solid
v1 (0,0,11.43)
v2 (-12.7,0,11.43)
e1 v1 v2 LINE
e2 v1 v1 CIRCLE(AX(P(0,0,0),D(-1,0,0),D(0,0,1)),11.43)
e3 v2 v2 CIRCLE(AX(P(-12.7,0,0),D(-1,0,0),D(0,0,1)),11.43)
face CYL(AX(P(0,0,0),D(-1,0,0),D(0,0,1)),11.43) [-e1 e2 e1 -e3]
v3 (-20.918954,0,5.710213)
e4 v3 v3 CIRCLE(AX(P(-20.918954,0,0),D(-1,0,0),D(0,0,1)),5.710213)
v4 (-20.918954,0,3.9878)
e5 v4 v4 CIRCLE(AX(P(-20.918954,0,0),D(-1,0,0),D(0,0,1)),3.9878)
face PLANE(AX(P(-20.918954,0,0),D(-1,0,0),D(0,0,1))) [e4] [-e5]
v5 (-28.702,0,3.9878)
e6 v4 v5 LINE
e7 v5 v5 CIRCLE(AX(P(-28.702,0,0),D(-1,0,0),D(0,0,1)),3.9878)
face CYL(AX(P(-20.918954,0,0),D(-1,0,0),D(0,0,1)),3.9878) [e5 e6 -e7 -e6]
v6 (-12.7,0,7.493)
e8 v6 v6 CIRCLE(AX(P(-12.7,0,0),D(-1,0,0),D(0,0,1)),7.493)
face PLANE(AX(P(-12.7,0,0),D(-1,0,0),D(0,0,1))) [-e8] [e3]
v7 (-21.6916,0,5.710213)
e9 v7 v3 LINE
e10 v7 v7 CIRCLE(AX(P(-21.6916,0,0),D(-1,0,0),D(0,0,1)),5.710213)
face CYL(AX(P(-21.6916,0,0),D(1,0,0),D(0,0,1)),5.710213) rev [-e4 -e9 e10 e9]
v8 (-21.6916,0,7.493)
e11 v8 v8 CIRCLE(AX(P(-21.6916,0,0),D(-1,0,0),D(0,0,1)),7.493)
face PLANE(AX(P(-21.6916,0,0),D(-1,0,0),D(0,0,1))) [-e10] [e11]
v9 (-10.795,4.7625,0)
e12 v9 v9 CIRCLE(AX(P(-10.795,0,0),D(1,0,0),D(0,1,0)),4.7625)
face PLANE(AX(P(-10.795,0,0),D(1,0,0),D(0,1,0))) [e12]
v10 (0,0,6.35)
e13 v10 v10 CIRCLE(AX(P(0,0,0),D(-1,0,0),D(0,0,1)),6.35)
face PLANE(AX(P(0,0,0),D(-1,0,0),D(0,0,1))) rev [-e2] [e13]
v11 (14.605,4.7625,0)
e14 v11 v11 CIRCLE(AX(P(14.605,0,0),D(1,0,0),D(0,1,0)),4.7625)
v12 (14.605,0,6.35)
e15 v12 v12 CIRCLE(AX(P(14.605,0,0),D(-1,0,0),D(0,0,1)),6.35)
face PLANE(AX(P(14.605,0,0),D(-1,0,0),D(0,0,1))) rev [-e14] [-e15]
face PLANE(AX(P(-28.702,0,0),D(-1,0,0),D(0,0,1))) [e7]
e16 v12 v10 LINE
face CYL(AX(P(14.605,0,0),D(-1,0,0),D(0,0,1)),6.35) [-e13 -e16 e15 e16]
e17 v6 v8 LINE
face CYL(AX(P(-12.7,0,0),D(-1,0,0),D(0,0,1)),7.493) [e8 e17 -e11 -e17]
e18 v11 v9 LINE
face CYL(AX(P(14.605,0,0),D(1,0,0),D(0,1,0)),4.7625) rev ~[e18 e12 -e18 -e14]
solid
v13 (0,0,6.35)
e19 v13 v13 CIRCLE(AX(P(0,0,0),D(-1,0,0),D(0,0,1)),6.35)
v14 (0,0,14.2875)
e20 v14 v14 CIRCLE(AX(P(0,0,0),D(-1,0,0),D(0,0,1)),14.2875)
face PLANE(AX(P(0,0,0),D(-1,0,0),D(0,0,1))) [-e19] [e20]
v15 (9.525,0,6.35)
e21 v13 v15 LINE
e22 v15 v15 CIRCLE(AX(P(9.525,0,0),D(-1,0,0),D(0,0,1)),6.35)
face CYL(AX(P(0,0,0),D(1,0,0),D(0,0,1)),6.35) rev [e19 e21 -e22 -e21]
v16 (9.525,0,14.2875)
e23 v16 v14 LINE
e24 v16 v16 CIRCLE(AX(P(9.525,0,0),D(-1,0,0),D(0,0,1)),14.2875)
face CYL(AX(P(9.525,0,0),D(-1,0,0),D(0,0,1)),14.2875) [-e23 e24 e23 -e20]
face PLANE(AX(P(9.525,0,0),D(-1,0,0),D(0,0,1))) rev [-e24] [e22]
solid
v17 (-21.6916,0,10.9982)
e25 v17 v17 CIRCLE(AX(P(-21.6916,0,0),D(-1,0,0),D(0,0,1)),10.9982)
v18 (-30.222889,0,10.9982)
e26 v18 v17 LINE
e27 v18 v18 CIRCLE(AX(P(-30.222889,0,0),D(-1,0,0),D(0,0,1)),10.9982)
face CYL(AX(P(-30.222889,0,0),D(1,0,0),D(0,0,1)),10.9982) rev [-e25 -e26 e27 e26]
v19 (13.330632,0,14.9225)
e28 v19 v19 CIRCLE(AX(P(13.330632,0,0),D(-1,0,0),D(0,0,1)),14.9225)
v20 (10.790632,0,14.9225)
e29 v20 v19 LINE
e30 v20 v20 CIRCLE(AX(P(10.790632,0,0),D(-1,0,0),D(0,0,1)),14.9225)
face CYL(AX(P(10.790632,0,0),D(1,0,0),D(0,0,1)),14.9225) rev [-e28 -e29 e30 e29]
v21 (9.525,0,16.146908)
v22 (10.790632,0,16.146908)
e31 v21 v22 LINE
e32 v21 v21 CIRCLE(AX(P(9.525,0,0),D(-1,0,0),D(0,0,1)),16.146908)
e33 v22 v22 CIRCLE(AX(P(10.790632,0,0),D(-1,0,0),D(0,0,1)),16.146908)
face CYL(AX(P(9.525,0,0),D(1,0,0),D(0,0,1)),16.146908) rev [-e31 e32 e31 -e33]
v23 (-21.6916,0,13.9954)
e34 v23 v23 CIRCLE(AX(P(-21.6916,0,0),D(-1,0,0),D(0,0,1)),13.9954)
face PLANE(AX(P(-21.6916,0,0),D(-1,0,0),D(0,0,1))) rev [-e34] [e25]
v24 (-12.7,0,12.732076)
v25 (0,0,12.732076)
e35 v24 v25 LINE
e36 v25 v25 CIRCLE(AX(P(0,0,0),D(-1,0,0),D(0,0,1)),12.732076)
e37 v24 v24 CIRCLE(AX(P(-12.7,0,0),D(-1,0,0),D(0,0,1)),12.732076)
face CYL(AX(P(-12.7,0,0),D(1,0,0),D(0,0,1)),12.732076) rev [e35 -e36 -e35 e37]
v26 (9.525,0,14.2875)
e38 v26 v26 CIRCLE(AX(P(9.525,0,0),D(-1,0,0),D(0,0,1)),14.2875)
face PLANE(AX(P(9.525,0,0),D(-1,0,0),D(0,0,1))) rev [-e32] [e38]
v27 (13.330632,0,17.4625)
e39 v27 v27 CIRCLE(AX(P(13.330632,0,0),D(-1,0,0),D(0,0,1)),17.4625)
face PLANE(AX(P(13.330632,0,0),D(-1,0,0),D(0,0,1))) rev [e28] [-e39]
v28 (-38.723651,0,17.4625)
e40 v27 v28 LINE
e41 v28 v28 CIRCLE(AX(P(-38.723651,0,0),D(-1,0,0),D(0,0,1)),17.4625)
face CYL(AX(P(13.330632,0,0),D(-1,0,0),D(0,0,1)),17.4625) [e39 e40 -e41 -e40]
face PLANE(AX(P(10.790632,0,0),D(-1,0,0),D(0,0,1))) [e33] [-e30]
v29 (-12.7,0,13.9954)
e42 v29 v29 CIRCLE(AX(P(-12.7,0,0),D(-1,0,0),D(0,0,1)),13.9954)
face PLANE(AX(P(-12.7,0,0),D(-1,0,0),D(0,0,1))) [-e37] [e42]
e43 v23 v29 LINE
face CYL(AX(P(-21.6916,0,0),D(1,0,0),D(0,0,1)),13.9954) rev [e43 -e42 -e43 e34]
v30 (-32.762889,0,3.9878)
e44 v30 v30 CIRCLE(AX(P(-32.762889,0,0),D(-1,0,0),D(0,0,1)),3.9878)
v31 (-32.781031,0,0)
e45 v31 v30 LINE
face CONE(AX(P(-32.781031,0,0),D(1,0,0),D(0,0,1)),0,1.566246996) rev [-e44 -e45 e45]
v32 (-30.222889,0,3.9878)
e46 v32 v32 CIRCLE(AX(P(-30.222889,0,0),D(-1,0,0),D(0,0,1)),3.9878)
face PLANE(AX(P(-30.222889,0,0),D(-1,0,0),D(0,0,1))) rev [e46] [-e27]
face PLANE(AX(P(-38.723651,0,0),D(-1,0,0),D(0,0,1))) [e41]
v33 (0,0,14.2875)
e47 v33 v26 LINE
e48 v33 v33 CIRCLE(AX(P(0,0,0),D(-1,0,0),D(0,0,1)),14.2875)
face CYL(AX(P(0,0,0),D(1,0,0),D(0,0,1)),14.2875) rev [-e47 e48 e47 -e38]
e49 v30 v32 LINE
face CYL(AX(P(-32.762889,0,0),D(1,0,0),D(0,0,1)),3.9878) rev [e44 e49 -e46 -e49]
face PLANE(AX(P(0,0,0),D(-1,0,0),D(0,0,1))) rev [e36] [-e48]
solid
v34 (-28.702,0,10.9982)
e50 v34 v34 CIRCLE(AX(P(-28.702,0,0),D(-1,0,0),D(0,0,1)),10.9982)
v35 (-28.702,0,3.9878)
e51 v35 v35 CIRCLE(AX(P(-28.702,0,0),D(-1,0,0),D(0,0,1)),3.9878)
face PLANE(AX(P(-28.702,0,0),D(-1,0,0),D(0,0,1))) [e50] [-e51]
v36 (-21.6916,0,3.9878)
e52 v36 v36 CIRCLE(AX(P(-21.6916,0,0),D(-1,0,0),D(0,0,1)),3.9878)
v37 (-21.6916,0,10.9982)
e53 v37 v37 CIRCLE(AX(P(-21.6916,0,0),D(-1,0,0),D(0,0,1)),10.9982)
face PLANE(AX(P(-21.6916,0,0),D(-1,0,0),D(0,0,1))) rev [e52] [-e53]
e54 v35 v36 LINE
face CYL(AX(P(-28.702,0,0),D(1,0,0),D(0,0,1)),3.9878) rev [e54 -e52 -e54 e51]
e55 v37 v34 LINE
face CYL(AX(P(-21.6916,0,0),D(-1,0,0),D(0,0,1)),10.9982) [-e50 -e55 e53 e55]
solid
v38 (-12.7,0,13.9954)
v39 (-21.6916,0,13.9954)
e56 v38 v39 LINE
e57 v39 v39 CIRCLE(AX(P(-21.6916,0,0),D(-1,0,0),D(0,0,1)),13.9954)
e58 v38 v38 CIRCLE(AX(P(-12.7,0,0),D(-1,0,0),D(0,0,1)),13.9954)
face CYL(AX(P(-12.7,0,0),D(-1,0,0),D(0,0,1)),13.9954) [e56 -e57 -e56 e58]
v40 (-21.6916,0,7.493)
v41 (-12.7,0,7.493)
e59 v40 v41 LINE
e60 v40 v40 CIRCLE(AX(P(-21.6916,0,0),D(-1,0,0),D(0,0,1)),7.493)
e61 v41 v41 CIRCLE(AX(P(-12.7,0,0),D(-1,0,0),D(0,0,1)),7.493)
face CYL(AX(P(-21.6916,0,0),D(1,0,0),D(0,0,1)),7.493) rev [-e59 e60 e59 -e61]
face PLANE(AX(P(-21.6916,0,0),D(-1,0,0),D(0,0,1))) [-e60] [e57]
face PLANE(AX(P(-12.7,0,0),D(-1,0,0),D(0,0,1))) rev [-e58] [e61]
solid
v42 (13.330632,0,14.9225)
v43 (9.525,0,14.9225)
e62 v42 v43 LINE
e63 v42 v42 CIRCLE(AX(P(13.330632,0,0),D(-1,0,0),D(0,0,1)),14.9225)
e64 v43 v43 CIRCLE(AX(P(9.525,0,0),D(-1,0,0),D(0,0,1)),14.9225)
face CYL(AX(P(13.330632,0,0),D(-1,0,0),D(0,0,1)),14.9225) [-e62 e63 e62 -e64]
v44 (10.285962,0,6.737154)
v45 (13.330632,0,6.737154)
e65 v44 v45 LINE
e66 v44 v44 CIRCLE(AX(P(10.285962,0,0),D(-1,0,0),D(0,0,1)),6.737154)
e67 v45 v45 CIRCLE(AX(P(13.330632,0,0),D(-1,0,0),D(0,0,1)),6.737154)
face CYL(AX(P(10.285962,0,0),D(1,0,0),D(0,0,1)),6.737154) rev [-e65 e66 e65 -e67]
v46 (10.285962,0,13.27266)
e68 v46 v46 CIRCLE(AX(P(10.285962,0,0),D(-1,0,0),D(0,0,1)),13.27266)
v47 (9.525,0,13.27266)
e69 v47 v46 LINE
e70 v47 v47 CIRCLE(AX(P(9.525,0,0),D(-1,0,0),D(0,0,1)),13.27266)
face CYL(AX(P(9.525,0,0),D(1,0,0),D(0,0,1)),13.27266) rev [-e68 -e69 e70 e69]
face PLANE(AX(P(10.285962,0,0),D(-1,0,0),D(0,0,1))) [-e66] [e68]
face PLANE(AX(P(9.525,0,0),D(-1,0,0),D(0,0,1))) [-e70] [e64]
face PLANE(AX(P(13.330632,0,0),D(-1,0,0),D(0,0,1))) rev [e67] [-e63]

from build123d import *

# Parameters (mm, degrees)
F3_R     = 4.7625
F4_DEPTH = 25.4


# Not quite as in the source:
# - a feature names something its author has since deleted; it is built from what else it names


with BuildPart() as f1:
    # F0 (on Front) → F1 (revolve)
    with BuildSketch(Plane.XZ):
        Polygon((-12.7, 0), (0, 0), (9.525, 0), (14.605, 0), (14.605, 6.35), (9.525, 6.35), (0, 6.35), (0, 11.43), (-12.7, 11.43), (-12.7, 7.493), (-21.6916, 7.493), (-21.6916, 5.7102125138), (-20.9189541638, 5.7102125138), (-20.9189541638, 3.9878), (-21.6916, 3.9878), (-28.702, 3.9878), (-28.702, 0), (-27.686, 0), (-26.6954, 0), (-21.6916, 0), align=None)
    revolve(axis=Axis((-24.1935, 0, 0), (-1, 0, 0)))

    # F3 (on face) → F4 (cut)
    with BuildSketch(Plane.YZ.offset(14.605)):
        Circle(F3_R)
    extrude(amount=-F4_DEPTH, mode=Mode.SUBTRACT)


with BuildPart() as f2:
    # F0 (on Front) → F2 (revolve)
    with BuildSketch(Plane.XZ):
        Polygon((0, 6.35), (9.525, 6.35), (9.525, 13.2726598531), (9.525, 14.2875), (0, 14.2875), (0, 12.7320755273), (0, 11.43), align=None)
    revolve(axis=Axis((0, 0, 0), (-1, 0, 0)))


with BuildPart() as f2b:
    # F0 (on Front) → F2, piece 2 (revolve)
    with BuildSketch(Plane.XZ):
        Polygon((-12.7, 7.493), (-12.7, 11.43), (-12.7, 12.7320755273), (-12.7, 13.9954), (-21.6916, 13.9954), (-21.6916, 10.9982), (-21.6916, 7.493), align=None)
    revolve(axis=Axis((0, 0, 0), (-1, 0, 0)))


with BuildPart() as f5:
    # F0 (on Front) → F5 (revolve)
    with BuildSketch(Plane.XZ):
        Polygon((0, 14.2875), (9.525, 14.2875), (9.525, 14.9225), (9.525, 16.1469075829), (10.7906318894, 16.1469075829), (10.7906318894, 14.9225), (13.3306318894, 14.9225), (13.3306318894, 17.4625), (-37.4693681106, 17.4625), (-38.7236513197, 17.4625), (-38.7236513197, 0), (-37.4693681106, 0), (-32.7810309827, 0), (-32.7628890359, 3.9878), (-30.2228890359, 3.9878), (-30.2228890359, 10.9982), (-28.702, 10.9982), (-27.686, 10.9982), (-21.6916, 10.9982), (-21.6916, 13.9954), (-12.7, 13.9954), (-12.7, 12.7320755273), (0, 12.7320755273), align=None)
    revolve(axis=Axis((-12.7, 0, 0), (-1, 0, 0)))


with BuildPart() as f6:
    # F0 (on Front) → F6 (revolve)
    with BuildSketch(Plane.XZ):
        Polygon((9.525, 14.2875), (9.525, 13.2726598531), (10.285962373, 13.2726598531), (10.285962373, 7.4942293577), (10.285962373, 6.7371539772), (13.3306318894, 6.7371539772), (13.3306318894, 7.4942293577), (13.3306318894, 14.9225), (10.7906318894, 14.9225), (9.525, 14.9225), align=None)
    revolve(axis=Axis((14.605, 0, 0), (-1, 0, 0)))


with BuildPart() as f7:
    # F0 (on Front) → F7 (revolve)
    with BuildSketch(Plane.XZ):
        Polygon((-28.702, 10.9982), (-28.702, 3.9878), (-21.6916, 3.9878), (-21.6916, 5.7102125138), (-21.6916, 7.493), (-21.6916, 10.9982), (-27.686, 10.9982), align=None)
    revolve(axis=Axis((13.3306318894, 0, 0), (-1, 0, 0)))


solid = Compound([f1.part, f2.part, f2b.part, f5.part, f6.part, f7.part])
